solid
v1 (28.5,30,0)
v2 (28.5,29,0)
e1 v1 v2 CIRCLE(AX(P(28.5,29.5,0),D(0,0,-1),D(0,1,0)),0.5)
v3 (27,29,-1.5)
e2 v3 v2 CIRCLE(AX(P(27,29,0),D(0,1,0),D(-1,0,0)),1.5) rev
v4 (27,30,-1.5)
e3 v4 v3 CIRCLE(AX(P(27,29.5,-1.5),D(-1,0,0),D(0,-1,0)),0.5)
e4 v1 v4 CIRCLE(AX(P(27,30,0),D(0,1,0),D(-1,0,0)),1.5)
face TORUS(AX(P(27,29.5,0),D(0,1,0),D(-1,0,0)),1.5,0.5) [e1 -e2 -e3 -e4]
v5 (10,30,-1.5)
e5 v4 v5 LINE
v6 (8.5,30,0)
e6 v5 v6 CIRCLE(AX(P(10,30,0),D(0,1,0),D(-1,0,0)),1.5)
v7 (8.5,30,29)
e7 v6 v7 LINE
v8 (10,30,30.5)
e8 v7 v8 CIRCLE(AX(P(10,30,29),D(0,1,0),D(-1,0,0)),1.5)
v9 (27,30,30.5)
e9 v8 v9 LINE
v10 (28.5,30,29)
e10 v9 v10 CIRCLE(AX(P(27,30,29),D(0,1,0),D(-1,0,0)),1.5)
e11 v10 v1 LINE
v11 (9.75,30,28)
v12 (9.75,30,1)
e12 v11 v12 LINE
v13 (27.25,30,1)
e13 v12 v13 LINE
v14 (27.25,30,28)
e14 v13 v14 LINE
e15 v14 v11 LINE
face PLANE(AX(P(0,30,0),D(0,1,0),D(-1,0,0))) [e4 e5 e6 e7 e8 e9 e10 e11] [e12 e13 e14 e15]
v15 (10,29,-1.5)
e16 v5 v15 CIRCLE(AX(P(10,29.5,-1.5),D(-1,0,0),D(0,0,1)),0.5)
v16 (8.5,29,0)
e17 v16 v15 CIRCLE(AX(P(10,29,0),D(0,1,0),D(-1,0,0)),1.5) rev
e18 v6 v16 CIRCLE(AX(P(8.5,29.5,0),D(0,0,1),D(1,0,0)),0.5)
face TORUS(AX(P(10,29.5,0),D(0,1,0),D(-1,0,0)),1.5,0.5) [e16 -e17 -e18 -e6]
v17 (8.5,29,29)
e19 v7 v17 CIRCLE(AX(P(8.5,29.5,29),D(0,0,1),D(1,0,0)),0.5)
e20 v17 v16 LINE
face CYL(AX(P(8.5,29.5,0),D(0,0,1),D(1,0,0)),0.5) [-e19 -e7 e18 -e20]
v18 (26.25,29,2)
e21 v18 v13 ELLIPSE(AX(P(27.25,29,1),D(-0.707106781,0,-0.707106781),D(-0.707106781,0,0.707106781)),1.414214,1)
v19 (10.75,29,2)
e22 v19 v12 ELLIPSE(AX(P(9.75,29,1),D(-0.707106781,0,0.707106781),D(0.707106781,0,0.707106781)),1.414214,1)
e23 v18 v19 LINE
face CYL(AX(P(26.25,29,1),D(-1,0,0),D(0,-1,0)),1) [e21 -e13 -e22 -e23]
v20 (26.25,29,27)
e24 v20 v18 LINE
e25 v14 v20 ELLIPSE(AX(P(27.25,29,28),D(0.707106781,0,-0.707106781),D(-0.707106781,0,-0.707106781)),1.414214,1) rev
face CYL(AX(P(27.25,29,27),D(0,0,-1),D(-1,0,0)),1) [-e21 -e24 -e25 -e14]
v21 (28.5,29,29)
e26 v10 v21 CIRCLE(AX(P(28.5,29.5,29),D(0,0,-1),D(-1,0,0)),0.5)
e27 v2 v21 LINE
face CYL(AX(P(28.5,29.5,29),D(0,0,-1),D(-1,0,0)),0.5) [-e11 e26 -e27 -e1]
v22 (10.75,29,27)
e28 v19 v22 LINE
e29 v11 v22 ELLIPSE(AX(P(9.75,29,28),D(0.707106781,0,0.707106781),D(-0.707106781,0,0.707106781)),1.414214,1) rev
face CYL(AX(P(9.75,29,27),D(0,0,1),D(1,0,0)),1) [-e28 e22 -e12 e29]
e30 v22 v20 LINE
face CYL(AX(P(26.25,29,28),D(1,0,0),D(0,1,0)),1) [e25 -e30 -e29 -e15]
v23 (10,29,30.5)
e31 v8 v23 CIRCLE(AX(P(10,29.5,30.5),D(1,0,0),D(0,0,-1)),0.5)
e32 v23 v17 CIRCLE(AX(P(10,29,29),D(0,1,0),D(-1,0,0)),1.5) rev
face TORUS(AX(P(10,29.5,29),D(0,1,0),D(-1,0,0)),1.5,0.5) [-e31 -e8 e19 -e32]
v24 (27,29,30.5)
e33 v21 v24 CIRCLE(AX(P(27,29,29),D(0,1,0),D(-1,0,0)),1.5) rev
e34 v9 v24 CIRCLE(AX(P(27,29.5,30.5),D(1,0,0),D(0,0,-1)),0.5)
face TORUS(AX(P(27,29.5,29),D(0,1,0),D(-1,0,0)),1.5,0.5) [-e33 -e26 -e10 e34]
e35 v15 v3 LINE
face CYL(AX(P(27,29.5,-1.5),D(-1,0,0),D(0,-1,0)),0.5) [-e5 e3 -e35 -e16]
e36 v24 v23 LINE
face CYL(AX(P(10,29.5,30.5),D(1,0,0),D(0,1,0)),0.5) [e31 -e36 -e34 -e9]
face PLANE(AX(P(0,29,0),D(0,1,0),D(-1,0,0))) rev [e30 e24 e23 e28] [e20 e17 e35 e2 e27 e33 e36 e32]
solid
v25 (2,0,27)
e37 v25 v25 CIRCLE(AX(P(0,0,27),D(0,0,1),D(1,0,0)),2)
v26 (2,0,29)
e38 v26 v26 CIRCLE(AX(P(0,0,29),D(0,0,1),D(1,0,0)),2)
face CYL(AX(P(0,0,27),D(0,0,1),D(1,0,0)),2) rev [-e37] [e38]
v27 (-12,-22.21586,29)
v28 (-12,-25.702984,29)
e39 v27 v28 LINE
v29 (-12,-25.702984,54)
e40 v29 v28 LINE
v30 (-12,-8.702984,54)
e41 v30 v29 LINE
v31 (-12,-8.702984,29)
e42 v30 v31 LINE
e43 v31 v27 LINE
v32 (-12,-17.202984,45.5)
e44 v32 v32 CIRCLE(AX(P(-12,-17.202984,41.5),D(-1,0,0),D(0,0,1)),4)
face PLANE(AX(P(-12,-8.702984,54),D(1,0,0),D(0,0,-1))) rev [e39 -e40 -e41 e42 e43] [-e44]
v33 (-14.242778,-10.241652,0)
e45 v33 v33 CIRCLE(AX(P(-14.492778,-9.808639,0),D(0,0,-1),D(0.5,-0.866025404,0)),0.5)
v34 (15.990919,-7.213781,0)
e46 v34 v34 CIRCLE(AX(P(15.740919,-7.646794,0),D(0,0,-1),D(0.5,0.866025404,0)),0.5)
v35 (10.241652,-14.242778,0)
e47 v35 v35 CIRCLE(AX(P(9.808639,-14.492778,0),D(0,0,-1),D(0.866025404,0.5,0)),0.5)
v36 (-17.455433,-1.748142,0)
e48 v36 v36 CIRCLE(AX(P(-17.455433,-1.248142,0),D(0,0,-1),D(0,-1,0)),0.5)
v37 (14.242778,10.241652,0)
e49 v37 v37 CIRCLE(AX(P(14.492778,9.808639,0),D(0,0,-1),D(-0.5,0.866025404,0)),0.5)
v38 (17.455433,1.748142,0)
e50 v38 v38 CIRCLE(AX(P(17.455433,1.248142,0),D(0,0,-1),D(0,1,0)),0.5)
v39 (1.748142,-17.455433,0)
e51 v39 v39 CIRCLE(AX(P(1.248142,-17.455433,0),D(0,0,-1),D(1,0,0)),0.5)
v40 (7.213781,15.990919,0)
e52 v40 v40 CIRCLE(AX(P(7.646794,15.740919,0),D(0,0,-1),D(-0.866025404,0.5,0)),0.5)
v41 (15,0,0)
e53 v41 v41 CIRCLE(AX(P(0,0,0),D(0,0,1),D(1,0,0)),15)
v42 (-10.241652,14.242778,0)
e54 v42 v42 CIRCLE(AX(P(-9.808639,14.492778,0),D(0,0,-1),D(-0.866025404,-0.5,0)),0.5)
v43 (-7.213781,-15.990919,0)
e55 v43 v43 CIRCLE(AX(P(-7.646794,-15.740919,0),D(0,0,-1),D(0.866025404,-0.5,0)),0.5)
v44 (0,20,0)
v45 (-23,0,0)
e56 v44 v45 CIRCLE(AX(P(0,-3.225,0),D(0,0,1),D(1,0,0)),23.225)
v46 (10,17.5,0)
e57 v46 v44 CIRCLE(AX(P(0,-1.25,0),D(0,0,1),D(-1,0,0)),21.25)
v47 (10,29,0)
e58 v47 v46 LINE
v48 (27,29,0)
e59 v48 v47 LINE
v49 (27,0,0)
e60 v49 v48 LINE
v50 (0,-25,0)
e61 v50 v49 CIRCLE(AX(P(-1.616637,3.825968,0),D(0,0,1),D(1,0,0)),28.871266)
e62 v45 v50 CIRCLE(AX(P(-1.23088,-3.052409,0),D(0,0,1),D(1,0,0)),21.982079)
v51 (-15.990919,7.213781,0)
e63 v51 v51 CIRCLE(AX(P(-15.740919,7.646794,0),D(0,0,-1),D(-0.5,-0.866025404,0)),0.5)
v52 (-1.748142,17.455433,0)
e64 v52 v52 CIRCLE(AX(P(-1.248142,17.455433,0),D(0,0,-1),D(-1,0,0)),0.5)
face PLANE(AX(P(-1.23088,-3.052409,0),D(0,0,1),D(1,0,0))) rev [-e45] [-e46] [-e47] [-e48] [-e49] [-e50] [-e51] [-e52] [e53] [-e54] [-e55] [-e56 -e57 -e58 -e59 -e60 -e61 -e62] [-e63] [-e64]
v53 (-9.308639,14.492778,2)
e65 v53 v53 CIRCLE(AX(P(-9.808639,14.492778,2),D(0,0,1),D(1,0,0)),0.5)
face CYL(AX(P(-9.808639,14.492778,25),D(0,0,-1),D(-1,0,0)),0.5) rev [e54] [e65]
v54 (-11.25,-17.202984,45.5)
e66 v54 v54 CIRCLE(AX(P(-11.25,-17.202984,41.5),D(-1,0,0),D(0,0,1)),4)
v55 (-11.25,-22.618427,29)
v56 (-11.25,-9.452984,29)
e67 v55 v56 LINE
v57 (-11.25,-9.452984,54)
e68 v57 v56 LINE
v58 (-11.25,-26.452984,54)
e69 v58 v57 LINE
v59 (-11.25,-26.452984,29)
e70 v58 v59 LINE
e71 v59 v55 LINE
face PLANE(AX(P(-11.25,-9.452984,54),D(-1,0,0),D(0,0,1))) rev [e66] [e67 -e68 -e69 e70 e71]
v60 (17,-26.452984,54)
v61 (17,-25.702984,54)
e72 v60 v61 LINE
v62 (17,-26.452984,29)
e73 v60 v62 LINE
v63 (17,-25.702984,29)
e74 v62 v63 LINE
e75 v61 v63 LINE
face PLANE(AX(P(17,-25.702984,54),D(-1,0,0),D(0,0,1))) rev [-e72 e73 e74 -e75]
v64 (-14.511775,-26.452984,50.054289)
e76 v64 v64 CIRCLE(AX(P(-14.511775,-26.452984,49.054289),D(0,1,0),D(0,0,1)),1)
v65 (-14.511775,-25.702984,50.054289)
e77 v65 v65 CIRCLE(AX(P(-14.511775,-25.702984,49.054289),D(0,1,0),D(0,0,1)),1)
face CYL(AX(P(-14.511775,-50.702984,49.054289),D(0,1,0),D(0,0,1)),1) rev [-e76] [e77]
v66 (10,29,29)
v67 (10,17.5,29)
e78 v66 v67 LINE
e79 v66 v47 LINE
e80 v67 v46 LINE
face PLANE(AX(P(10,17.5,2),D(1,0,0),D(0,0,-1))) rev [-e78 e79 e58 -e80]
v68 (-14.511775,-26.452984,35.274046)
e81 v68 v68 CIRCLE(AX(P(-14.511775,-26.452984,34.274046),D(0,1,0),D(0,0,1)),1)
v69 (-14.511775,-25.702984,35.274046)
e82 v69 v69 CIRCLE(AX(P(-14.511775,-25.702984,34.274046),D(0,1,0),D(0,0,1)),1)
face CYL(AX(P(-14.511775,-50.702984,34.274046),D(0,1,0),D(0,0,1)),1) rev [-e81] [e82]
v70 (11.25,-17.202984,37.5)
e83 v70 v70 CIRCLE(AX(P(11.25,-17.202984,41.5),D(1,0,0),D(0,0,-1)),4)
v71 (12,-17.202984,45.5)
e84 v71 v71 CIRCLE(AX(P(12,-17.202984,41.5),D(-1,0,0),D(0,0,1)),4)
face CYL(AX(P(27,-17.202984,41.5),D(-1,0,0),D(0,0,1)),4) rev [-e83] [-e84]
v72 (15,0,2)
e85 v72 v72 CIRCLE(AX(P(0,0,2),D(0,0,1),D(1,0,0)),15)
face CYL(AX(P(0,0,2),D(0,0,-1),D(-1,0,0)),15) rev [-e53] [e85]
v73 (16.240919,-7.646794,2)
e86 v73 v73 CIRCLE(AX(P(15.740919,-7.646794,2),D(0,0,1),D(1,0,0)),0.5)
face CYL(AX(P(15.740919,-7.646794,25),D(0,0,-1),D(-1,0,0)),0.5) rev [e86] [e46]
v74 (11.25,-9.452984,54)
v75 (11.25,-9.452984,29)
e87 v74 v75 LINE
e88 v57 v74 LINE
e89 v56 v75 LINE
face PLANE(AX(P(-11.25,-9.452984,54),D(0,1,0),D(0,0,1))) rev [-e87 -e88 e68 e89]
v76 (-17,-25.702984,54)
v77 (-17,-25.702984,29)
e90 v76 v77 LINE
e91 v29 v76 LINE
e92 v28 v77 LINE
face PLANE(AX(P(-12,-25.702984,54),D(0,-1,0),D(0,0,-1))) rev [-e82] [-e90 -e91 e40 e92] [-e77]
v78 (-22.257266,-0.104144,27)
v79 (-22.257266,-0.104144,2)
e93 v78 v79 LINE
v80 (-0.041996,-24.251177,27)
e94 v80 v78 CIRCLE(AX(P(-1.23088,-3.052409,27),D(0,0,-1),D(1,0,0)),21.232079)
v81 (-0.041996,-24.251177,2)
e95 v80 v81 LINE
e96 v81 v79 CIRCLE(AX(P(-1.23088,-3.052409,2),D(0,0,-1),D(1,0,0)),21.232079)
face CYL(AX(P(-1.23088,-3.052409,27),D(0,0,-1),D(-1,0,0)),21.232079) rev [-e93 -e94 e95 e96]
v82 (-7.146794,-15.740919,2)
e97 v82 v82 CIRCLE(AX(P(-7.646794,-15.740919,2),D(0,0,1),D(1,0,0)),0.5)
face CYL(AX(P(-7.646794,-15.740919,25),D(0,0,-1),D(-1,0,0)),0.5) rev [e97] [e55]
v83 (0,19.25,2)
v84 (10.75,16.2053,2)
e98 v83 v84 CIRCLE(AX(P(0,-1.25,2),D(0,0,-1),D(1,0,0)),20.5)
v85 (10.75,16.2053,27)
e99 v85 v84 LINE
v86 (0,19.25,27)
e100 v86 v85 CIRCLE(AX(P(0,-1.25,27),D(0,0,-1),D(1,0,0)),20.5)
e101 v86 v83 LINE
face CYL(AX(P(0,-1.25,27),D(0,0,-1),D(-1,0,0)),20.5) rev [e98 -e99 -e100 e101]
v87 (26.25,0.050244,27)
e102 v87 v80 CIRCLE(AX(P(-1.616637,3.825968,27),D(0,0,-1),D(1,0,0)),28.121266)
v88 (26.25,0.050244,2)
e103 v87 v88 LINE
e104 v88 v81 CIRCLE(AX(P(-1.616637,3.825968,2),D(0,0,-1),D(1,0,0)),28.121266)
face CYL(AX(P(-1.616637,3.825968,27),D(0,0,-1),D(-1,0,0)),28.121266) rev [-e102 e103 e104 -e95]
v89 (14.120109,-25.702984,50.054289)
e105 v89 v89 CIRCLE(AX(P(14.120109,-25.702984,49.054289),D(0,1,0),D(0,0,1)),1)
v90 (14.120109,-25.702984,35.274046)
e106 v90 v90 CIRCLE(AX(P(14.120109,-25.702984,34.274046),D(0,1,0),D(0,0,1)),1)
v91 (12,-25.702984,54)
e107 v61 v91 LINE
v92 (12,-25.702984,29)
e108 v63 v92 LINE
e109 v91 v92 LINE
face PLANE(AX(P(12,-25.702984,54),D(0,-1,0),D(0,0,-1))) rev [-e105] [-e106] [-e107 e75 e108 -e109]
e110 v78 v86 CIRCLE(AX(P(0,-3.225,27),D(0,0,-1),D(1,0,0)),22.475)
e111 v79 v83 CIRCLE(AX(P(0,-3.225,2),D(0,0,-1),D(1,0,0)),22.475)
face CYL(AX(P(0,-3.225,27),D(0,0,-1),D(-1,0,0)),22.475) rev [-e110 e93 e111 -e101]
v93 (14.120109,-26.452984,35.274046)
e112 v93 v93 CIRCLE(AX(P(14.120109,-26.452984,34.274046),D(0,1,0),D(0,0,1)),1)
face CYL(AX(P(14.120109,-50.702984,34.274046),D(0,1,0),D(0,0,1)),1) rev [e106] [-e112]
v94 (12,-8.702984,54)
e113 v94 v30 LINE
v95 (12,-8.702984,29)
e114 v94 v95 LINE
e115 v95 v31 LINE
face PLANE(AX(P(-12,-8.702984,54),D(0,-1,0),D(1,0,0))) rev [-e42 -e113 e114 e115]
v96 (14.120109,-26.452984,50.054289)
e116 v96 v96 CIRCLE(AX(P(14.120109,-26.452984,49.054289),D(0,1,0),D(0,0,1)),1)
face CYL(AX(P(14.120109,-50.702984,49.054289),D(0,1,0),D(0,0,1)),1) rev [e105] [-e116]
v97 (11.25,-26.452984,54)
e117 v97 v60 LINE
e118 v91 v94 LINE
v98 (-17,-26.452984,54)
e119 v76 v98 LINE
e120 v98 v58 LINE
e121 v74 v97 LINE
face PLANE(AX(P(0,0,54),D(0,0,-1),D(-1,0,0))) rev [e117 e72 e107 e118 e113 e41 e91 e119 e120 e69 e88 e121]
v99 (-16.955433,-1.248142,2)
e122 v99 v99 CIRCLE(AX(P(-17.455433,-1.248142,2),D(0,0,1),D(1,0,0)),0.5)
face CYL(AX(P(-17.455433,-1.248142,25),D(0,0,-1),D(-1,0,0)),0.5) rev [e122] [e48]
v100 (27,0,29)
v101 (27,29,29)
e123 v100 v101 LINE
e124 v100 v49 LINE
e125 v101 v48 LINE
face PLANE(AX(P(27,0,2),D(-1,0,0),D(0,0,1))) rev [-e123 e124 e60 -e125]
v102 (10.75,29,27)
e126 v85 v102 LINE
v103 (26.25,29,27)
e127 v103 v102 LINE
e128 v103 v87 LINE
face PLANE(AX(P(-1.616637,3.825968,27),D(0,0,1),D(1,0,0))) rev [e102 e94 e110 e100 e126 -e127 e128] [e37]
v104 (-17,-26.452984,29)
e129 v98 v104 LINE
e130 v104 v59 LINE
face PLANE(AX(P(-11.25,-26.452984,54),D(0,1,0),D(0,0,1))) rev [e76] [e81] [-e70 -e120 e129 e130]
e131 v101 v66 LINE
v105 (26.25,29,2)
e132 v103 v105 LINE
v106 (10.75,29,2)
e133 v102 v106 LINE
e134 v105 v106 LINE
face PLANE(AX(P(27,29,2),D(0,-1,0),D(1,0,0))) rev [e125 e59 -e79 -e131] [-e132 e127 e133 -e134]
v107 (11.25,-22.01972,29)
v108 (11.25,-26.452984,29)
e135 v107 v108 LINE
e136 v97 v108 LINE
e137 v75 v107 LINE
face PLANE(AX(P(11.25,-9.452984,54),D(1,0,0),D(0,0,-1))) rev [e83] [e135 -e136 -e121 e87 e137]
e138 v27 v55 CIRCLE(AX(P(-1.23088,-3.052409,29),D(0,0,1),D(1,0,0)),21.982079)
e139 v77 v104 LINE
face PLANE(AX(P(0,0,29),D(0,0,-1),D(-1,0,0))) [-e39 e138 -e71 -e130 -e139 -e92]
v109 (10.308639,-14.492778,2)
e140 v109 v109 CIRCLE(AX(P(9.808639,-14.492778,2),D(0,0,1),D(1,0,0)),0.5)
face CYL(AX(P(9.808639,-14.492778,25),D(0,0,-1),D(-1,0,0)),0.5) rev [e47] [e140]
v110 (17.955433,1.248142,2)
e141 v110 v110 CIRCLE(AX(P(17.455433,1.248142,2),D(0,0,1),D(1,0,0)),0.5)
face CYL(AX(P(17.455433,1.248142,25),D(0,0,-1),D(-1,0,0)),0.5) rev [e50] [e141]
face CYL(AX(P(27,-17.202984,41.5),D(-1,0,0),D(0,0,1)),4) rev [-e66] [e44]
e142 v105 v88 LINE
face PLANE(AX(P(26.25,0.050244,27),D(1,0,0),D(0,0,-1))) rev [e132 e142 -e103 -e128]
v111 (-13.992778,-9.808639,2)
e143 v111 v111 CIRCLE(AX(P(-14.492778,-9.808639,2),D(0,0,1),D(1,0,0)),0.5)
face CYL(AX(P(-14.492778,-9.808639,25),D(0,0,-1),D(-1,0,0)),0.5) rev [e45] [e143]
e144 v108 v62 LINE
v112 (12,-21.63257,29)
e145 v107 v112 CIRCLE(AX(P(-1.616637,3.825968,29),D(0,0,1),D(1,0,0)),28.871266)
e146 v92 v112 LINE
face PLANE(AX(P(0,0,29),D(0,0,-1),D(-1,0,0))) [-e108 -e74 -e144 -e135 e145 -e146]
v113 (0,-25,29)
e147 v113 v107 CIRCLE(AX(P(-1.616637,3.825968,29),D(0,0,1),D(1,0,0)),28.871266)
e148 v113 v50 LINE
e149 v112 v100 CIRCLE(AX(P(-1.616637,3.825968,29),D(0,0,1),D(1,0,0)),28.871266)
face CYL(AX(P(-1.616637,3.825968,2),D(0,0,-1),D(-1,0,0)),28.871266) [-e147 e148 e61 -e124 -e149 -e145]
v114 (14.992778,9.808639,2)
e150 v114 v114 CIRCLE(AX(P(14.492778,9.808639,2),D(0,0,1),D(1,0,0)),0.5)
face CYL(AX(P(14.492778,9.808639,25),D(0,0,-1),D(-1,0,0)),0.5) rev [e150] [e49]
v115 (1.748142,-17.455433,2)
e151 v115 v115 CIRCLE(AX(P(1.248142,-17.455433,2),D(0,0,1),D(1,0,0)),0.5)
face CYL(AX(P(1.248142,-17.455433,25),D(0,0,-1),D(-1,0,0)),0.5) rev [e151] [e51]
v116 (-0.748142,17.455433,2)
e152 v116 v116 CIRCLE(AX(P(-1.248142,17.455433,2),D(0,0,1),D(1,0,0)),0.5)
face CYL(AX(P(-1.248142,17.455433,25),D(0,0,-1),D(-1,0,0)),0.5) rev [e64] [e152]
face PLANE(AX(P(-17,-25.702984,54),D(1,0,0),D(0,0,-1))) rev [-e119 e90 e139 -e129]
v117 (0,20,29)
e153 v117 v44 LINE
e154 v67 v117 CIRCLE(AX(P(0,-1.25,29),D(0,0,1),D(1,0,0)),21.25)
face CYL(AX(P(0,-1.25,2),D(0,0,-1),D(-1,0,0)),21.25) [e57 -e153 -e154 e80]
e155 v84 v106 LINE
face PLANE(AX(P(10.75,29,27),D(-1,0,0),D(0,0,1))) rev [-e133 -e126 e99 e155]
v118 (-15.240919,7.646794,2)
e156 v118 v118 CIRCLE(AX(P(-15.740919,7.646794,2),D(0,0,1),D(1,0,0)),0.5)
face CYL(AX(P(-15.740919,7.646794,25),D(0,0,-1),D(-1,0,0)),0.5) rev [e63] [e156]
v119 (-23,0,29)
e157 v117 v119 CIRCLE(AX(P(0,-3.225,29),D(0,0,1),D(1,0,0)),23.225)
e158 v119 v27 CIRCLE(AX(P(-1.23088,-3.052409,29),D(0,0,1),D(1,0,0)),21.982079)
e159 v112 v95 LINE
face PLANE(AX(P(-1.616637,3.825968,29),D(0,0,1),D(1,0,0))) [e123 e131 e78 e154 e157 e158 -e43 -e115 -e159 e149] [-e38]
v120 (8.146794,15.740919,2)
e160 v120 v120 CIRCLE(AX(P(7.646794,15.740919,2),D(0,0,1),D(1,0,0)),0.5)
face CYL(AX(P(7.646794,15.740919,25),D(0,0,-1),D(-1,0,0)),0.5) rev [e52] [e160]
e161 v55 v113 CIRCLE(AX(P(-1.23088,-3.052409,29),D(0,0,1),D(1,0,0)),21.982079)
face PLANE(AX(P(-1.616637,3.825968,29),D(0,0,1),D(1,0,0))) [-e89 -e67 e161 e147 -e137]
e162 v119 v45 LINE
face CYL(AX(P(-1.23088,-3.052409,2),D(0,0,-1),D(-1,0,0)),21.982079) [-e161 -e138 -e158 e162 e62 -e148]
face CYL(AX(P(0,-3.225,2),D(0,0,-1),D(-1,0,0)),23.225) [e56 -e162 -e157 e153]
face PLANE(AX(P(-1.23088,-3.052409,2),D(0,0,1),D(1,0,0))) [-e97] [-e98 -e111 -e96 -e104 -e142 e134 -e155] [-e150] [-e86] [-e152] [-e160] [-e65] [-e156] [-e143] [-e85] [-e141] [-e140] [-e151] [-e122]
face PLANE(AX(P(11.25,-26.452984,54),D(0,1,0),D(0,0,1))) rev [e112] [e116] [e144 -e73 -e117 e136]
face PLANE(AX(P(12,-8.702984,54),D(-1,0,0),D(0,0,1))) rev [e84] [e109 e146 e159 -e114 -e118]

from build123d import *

# Parameters (mm, degrees)
SKETCH3_R           = 15
BOSS_EXTRUDE1_DEPTH = 2
BOSS_EXTRUDE2_DEPTH = 25
BOSS_EXTRUDE4_DEPTH = 2
SKETCH7_R           = 2
CUT_EXTRUDE1_DEPTH  = 2
BOSS_EXTRUDE5_DEPTH = 25
SKETCH9_R           = 4
CUT_EXTRUDE2_DEPTH  = 73.649845148
SKETCH10_R          = 1
CUT_EXTRUDE3_DEPTH  = 25
SKETCH18_R          = 0.5
CUT_EXTRUDE4_DEPTH  = 25
CIRPATTERN1_COUNT   = 12
SKETCH11_W          = 21
SKETCH11_H          = 33
SKETCH11_W_2        = 15.5
SKETCH11_H_2        = 25
BOSS_EXTRUDE7_DEPTH = 1
FILLET1_R           = 2
FILLET2_R           = 0.5
FILLET3_R           = 1


with BuildPart() as part:
    # Sketch3 → Boss-Extrude1 (new body)
    with BuildSketch(Plane.XY):
        with BuildLine():
            Line((27, 0), (27, 29))
            Line((27, 29), (10, 29))
            Line((10, 29), (10, 17.5))
            ThreePointArc((10, 17.5), (5.153882032, 19.365528128), (0, 20))
            ThreePointArc((0, 20), (-15.239750654, 14.300713252), (-23, 0))
            ThreePointArc((-23, 0), (-17.408173386, -17.935519516), (0, -25))
            ThreePointArc((0, -25), (17.998732227, -17.358630805), (27, 0))
        make_face()
        Circle(SKETCH3_R, mode=Mode.SUBTRACT)
    extrude(amount=BOSS_EXTRUDE1_DEPTH)

    # Sketch4 → Boss-Extrude2 (add)
    with BuildSketch(Plane.XY.offset(2)):
        with BuildLine():
            Line((10.75, 29), (10.75, 16.205300055))
            ThreePointArc((10.75, 16.205300055), (5.586427699, 18.474143215), (0, 19.25))
            ThreePointArc((0, 19.25), (-14.747616618, 13.734759111), (-22.257265877, -0.104144241))
            ThreePointArc((-22.257265877, -0.104144241), (-16.856225128, -17.427727117), (-0.041996015, -24.2511767))
            ThreePointArc((-0.041996015, -24.2511767), (17.470976117, -16.825147336), (26.25, 0.050244354))
            Line((26.25, 0.050244354), (26.25, 29))
            Line((26.25, 29), (27, 29))
            Line((27, 29), (27, 0))
            ThreePointArc((27, 0), (17.998732227, -17.358630805), (0, -25))
            ThreePointArc((0, -25), (-17.408173386, -17.935519516), (-23, 0))
            ThreePointArc((-23, 0), (-15.239750654, 14.300713252), (0, 20))
            ThreePointArc((0, 20), (5.153882032, 19.365528128), (10, 17.5))
            Line((10, 17.5), (10, 29))
            Line((10, 29), (10.75, 29))
        make_face()
    extrude(amount=BOSS_EXTRUDE2_DEPTH)

    # Sketch6 → Boss-Extrude4 (add)
    with BuildSketch(Plane.XY.offset(27)):
        with BuildLine():
            Line((10, 29), (27, 29))
            Line((27, 29), (27, 0))
            ThreePointArc((27, 0), (17.998732227, -17.358630805), (0, -25))
            ThreePointArc((0, -25), (-17.408173386, -17.935519516), (-23, 0))
            ThreePointArc((-23, 0), (-15.239750654, 14.300713252), (0, 20))
            ThreePointArc((0, 20), (5.153882032, 19.365528128), (10, 17.5))
            Line((10, 17.5), (10, 29))
        make_face()
    extrude(amount=BOSS_EXTRUDE4_DEPTH)

    # Sketch7 → Cut-Extrude1 (cut)
    with BuildSketch(Plane.XY.offset(29)):
        Circle(SKETCH7_R)
    extrude(amount=-CUT_EXTRUDE1_DEPTH, mode=Mode.SUBTRACT)

    # Sketch8 → Boss-Extrude5 (add)
    with BuildSketch(Plane.XY.offset(29)):
        Polygon((-12, -8.702983609), (12, -8.702983609), (12, -25.702983609), (17, -25.702983609), (17, -26.452983609), (11.25, -26.452983609), (11.25, -9.452983609), (-11.25, -9.452983609), (-11.25, -26.452983609), (-17, -26.452983609), (-17, -25.702983609), (-12, -25.702983609), align=None)
    extrude(amount=BOSS_EXTRUDE5_DEPTH)

    # Sketch9 → Cut-Extrude2 (cut, through all)
    with BuildSketch(Plane.ZY.offset(12)):
        with Locations((41.5, -17.202983609)):
            Circle(SKETCH9_R)
    extrude(amount=-CUT_EXTRUDE2_DEPTH, mode=Mode.SUBTRACT)

    # Sketch10 → Cut-Extrude3 (cut)
    with BuildSketch(Plane(origin=(0, -25.702983609, 0), x_dir=(1, 0, 0), z_dir=(0, 1, 0))):
        with Locations(Location((-14.511775324, -34.274046309, 0), (0, 0, 270))):
            Circle(SKETCH10_R)
        with Locations(Location((-14.511775324, -49.054289342, 0), (0, 0, 270))):
            Circle(SKETCH10_R)
        with Locations(Location((14.120109084, -49.054289342, 0), (0, 0, 270))):
            Circle(SKETCH10_R)
        with Locations(Location((14.120109084, -34.274046309, 0), (0, 0, 270))):
            Circle(SKETCH10_R)
    extrude(amount=-CUT_EXTRUDE3_DEPTH, mode=Mode.SUBTRACT)

    # Sketch18 → Cut-Extrude4 (cut)
    with BuildSketch(Plane(origin=(0, 0, 0), x_dir=(-1, 0, 0), z_dir=(0, 0, -1))):
        with Locations((1.248141766, 17.455433026)):
            Circle(SKETCH18_R)
    cut_extrude4 = extrude(amount=-CUT_EXTRUDE4_DEPTH, mode=Mode.SUBTRACT)

    # CirPattern1: Cut-Extrude4 ×12 about axis
    cirpattern1_axis = Axis((0, 0, 0), (0, 0, 1))
    for i in range(1, CIRPATTERN1_COUNT):
        add(cut_extrude4.rotate(cirpattern1_axis, i * 360 / CIRPATTERN1_COUNT), mode=Mode.SUBTRACT)


with BuildPart() as body_2:
    # Sketch11 → Boss-Extrude7 (new body)
    with BuildSketch(Plane(origin=(0, 29, 0), x_dir=(1, 0, 0), z_dir=(0, 1, 0))):
        with Locations((18.5, -14.5)):
            Rectangle(SKETCH11_W, SKETCH11_H)
        with Locations((18.5, -14.5)):
            Rectangle(SKETCH11_W_2, SKETCH11_H_2, mode=Mode.SUBTRACT)
    extrude(amount=BOSS_EXTRUDE7_DEPTH)

    # Fillet1
    fillet1_edges = [body_2.edges().sort_by_distance(p)[0] for p in [
        (29, 29.5, 31),
        (8, 29.5, 31),
        (8, 29.5, -2),
        (29, 29.5, -2),
    ]]
    fillet(fillet1_edges, radius=FILLET1_R)

    # Fillet2
    fillet2_edges = [body_2.edges().sort_by_distance(p)[0] for p in [
        (29, 29, 14.5),
        (29, 30, 14.5),
        (18.5, 29, 31),
        (8, 29, 14.5),
        (18.5, 29, -2),
        (8.585786438, 29, 30.414213562),
        (8.585786438, 29, -1.414213562),
        (28.414213562, 29, -1.414213562),
        (28.414213562, 29, 30.414213562),
        (18.5, 30, 31),
        (18.5, 30, -2),
        (8, 30, 14.5),
    ]]
    fillet(fillet2_edges, radius=FILLET2_R - 0.0001)  # a hair under: the kernel refuses the full size

    # Fillet3
    fillet3_edges = [body_2.edges().sort_by_distance(p)[0] for p in [
        (10.75, 30, 14.5),
        (18.5, 30, 2),
        (26.25, 30, 14.5),
        (18.5, 30, 27),
    ]]
    fillet(fillet3_edges, radius=FILLET3_R - 0.0001)  # a hair under: the kernel refuses the full size


solid = Compound([part.part, body_2.part])
